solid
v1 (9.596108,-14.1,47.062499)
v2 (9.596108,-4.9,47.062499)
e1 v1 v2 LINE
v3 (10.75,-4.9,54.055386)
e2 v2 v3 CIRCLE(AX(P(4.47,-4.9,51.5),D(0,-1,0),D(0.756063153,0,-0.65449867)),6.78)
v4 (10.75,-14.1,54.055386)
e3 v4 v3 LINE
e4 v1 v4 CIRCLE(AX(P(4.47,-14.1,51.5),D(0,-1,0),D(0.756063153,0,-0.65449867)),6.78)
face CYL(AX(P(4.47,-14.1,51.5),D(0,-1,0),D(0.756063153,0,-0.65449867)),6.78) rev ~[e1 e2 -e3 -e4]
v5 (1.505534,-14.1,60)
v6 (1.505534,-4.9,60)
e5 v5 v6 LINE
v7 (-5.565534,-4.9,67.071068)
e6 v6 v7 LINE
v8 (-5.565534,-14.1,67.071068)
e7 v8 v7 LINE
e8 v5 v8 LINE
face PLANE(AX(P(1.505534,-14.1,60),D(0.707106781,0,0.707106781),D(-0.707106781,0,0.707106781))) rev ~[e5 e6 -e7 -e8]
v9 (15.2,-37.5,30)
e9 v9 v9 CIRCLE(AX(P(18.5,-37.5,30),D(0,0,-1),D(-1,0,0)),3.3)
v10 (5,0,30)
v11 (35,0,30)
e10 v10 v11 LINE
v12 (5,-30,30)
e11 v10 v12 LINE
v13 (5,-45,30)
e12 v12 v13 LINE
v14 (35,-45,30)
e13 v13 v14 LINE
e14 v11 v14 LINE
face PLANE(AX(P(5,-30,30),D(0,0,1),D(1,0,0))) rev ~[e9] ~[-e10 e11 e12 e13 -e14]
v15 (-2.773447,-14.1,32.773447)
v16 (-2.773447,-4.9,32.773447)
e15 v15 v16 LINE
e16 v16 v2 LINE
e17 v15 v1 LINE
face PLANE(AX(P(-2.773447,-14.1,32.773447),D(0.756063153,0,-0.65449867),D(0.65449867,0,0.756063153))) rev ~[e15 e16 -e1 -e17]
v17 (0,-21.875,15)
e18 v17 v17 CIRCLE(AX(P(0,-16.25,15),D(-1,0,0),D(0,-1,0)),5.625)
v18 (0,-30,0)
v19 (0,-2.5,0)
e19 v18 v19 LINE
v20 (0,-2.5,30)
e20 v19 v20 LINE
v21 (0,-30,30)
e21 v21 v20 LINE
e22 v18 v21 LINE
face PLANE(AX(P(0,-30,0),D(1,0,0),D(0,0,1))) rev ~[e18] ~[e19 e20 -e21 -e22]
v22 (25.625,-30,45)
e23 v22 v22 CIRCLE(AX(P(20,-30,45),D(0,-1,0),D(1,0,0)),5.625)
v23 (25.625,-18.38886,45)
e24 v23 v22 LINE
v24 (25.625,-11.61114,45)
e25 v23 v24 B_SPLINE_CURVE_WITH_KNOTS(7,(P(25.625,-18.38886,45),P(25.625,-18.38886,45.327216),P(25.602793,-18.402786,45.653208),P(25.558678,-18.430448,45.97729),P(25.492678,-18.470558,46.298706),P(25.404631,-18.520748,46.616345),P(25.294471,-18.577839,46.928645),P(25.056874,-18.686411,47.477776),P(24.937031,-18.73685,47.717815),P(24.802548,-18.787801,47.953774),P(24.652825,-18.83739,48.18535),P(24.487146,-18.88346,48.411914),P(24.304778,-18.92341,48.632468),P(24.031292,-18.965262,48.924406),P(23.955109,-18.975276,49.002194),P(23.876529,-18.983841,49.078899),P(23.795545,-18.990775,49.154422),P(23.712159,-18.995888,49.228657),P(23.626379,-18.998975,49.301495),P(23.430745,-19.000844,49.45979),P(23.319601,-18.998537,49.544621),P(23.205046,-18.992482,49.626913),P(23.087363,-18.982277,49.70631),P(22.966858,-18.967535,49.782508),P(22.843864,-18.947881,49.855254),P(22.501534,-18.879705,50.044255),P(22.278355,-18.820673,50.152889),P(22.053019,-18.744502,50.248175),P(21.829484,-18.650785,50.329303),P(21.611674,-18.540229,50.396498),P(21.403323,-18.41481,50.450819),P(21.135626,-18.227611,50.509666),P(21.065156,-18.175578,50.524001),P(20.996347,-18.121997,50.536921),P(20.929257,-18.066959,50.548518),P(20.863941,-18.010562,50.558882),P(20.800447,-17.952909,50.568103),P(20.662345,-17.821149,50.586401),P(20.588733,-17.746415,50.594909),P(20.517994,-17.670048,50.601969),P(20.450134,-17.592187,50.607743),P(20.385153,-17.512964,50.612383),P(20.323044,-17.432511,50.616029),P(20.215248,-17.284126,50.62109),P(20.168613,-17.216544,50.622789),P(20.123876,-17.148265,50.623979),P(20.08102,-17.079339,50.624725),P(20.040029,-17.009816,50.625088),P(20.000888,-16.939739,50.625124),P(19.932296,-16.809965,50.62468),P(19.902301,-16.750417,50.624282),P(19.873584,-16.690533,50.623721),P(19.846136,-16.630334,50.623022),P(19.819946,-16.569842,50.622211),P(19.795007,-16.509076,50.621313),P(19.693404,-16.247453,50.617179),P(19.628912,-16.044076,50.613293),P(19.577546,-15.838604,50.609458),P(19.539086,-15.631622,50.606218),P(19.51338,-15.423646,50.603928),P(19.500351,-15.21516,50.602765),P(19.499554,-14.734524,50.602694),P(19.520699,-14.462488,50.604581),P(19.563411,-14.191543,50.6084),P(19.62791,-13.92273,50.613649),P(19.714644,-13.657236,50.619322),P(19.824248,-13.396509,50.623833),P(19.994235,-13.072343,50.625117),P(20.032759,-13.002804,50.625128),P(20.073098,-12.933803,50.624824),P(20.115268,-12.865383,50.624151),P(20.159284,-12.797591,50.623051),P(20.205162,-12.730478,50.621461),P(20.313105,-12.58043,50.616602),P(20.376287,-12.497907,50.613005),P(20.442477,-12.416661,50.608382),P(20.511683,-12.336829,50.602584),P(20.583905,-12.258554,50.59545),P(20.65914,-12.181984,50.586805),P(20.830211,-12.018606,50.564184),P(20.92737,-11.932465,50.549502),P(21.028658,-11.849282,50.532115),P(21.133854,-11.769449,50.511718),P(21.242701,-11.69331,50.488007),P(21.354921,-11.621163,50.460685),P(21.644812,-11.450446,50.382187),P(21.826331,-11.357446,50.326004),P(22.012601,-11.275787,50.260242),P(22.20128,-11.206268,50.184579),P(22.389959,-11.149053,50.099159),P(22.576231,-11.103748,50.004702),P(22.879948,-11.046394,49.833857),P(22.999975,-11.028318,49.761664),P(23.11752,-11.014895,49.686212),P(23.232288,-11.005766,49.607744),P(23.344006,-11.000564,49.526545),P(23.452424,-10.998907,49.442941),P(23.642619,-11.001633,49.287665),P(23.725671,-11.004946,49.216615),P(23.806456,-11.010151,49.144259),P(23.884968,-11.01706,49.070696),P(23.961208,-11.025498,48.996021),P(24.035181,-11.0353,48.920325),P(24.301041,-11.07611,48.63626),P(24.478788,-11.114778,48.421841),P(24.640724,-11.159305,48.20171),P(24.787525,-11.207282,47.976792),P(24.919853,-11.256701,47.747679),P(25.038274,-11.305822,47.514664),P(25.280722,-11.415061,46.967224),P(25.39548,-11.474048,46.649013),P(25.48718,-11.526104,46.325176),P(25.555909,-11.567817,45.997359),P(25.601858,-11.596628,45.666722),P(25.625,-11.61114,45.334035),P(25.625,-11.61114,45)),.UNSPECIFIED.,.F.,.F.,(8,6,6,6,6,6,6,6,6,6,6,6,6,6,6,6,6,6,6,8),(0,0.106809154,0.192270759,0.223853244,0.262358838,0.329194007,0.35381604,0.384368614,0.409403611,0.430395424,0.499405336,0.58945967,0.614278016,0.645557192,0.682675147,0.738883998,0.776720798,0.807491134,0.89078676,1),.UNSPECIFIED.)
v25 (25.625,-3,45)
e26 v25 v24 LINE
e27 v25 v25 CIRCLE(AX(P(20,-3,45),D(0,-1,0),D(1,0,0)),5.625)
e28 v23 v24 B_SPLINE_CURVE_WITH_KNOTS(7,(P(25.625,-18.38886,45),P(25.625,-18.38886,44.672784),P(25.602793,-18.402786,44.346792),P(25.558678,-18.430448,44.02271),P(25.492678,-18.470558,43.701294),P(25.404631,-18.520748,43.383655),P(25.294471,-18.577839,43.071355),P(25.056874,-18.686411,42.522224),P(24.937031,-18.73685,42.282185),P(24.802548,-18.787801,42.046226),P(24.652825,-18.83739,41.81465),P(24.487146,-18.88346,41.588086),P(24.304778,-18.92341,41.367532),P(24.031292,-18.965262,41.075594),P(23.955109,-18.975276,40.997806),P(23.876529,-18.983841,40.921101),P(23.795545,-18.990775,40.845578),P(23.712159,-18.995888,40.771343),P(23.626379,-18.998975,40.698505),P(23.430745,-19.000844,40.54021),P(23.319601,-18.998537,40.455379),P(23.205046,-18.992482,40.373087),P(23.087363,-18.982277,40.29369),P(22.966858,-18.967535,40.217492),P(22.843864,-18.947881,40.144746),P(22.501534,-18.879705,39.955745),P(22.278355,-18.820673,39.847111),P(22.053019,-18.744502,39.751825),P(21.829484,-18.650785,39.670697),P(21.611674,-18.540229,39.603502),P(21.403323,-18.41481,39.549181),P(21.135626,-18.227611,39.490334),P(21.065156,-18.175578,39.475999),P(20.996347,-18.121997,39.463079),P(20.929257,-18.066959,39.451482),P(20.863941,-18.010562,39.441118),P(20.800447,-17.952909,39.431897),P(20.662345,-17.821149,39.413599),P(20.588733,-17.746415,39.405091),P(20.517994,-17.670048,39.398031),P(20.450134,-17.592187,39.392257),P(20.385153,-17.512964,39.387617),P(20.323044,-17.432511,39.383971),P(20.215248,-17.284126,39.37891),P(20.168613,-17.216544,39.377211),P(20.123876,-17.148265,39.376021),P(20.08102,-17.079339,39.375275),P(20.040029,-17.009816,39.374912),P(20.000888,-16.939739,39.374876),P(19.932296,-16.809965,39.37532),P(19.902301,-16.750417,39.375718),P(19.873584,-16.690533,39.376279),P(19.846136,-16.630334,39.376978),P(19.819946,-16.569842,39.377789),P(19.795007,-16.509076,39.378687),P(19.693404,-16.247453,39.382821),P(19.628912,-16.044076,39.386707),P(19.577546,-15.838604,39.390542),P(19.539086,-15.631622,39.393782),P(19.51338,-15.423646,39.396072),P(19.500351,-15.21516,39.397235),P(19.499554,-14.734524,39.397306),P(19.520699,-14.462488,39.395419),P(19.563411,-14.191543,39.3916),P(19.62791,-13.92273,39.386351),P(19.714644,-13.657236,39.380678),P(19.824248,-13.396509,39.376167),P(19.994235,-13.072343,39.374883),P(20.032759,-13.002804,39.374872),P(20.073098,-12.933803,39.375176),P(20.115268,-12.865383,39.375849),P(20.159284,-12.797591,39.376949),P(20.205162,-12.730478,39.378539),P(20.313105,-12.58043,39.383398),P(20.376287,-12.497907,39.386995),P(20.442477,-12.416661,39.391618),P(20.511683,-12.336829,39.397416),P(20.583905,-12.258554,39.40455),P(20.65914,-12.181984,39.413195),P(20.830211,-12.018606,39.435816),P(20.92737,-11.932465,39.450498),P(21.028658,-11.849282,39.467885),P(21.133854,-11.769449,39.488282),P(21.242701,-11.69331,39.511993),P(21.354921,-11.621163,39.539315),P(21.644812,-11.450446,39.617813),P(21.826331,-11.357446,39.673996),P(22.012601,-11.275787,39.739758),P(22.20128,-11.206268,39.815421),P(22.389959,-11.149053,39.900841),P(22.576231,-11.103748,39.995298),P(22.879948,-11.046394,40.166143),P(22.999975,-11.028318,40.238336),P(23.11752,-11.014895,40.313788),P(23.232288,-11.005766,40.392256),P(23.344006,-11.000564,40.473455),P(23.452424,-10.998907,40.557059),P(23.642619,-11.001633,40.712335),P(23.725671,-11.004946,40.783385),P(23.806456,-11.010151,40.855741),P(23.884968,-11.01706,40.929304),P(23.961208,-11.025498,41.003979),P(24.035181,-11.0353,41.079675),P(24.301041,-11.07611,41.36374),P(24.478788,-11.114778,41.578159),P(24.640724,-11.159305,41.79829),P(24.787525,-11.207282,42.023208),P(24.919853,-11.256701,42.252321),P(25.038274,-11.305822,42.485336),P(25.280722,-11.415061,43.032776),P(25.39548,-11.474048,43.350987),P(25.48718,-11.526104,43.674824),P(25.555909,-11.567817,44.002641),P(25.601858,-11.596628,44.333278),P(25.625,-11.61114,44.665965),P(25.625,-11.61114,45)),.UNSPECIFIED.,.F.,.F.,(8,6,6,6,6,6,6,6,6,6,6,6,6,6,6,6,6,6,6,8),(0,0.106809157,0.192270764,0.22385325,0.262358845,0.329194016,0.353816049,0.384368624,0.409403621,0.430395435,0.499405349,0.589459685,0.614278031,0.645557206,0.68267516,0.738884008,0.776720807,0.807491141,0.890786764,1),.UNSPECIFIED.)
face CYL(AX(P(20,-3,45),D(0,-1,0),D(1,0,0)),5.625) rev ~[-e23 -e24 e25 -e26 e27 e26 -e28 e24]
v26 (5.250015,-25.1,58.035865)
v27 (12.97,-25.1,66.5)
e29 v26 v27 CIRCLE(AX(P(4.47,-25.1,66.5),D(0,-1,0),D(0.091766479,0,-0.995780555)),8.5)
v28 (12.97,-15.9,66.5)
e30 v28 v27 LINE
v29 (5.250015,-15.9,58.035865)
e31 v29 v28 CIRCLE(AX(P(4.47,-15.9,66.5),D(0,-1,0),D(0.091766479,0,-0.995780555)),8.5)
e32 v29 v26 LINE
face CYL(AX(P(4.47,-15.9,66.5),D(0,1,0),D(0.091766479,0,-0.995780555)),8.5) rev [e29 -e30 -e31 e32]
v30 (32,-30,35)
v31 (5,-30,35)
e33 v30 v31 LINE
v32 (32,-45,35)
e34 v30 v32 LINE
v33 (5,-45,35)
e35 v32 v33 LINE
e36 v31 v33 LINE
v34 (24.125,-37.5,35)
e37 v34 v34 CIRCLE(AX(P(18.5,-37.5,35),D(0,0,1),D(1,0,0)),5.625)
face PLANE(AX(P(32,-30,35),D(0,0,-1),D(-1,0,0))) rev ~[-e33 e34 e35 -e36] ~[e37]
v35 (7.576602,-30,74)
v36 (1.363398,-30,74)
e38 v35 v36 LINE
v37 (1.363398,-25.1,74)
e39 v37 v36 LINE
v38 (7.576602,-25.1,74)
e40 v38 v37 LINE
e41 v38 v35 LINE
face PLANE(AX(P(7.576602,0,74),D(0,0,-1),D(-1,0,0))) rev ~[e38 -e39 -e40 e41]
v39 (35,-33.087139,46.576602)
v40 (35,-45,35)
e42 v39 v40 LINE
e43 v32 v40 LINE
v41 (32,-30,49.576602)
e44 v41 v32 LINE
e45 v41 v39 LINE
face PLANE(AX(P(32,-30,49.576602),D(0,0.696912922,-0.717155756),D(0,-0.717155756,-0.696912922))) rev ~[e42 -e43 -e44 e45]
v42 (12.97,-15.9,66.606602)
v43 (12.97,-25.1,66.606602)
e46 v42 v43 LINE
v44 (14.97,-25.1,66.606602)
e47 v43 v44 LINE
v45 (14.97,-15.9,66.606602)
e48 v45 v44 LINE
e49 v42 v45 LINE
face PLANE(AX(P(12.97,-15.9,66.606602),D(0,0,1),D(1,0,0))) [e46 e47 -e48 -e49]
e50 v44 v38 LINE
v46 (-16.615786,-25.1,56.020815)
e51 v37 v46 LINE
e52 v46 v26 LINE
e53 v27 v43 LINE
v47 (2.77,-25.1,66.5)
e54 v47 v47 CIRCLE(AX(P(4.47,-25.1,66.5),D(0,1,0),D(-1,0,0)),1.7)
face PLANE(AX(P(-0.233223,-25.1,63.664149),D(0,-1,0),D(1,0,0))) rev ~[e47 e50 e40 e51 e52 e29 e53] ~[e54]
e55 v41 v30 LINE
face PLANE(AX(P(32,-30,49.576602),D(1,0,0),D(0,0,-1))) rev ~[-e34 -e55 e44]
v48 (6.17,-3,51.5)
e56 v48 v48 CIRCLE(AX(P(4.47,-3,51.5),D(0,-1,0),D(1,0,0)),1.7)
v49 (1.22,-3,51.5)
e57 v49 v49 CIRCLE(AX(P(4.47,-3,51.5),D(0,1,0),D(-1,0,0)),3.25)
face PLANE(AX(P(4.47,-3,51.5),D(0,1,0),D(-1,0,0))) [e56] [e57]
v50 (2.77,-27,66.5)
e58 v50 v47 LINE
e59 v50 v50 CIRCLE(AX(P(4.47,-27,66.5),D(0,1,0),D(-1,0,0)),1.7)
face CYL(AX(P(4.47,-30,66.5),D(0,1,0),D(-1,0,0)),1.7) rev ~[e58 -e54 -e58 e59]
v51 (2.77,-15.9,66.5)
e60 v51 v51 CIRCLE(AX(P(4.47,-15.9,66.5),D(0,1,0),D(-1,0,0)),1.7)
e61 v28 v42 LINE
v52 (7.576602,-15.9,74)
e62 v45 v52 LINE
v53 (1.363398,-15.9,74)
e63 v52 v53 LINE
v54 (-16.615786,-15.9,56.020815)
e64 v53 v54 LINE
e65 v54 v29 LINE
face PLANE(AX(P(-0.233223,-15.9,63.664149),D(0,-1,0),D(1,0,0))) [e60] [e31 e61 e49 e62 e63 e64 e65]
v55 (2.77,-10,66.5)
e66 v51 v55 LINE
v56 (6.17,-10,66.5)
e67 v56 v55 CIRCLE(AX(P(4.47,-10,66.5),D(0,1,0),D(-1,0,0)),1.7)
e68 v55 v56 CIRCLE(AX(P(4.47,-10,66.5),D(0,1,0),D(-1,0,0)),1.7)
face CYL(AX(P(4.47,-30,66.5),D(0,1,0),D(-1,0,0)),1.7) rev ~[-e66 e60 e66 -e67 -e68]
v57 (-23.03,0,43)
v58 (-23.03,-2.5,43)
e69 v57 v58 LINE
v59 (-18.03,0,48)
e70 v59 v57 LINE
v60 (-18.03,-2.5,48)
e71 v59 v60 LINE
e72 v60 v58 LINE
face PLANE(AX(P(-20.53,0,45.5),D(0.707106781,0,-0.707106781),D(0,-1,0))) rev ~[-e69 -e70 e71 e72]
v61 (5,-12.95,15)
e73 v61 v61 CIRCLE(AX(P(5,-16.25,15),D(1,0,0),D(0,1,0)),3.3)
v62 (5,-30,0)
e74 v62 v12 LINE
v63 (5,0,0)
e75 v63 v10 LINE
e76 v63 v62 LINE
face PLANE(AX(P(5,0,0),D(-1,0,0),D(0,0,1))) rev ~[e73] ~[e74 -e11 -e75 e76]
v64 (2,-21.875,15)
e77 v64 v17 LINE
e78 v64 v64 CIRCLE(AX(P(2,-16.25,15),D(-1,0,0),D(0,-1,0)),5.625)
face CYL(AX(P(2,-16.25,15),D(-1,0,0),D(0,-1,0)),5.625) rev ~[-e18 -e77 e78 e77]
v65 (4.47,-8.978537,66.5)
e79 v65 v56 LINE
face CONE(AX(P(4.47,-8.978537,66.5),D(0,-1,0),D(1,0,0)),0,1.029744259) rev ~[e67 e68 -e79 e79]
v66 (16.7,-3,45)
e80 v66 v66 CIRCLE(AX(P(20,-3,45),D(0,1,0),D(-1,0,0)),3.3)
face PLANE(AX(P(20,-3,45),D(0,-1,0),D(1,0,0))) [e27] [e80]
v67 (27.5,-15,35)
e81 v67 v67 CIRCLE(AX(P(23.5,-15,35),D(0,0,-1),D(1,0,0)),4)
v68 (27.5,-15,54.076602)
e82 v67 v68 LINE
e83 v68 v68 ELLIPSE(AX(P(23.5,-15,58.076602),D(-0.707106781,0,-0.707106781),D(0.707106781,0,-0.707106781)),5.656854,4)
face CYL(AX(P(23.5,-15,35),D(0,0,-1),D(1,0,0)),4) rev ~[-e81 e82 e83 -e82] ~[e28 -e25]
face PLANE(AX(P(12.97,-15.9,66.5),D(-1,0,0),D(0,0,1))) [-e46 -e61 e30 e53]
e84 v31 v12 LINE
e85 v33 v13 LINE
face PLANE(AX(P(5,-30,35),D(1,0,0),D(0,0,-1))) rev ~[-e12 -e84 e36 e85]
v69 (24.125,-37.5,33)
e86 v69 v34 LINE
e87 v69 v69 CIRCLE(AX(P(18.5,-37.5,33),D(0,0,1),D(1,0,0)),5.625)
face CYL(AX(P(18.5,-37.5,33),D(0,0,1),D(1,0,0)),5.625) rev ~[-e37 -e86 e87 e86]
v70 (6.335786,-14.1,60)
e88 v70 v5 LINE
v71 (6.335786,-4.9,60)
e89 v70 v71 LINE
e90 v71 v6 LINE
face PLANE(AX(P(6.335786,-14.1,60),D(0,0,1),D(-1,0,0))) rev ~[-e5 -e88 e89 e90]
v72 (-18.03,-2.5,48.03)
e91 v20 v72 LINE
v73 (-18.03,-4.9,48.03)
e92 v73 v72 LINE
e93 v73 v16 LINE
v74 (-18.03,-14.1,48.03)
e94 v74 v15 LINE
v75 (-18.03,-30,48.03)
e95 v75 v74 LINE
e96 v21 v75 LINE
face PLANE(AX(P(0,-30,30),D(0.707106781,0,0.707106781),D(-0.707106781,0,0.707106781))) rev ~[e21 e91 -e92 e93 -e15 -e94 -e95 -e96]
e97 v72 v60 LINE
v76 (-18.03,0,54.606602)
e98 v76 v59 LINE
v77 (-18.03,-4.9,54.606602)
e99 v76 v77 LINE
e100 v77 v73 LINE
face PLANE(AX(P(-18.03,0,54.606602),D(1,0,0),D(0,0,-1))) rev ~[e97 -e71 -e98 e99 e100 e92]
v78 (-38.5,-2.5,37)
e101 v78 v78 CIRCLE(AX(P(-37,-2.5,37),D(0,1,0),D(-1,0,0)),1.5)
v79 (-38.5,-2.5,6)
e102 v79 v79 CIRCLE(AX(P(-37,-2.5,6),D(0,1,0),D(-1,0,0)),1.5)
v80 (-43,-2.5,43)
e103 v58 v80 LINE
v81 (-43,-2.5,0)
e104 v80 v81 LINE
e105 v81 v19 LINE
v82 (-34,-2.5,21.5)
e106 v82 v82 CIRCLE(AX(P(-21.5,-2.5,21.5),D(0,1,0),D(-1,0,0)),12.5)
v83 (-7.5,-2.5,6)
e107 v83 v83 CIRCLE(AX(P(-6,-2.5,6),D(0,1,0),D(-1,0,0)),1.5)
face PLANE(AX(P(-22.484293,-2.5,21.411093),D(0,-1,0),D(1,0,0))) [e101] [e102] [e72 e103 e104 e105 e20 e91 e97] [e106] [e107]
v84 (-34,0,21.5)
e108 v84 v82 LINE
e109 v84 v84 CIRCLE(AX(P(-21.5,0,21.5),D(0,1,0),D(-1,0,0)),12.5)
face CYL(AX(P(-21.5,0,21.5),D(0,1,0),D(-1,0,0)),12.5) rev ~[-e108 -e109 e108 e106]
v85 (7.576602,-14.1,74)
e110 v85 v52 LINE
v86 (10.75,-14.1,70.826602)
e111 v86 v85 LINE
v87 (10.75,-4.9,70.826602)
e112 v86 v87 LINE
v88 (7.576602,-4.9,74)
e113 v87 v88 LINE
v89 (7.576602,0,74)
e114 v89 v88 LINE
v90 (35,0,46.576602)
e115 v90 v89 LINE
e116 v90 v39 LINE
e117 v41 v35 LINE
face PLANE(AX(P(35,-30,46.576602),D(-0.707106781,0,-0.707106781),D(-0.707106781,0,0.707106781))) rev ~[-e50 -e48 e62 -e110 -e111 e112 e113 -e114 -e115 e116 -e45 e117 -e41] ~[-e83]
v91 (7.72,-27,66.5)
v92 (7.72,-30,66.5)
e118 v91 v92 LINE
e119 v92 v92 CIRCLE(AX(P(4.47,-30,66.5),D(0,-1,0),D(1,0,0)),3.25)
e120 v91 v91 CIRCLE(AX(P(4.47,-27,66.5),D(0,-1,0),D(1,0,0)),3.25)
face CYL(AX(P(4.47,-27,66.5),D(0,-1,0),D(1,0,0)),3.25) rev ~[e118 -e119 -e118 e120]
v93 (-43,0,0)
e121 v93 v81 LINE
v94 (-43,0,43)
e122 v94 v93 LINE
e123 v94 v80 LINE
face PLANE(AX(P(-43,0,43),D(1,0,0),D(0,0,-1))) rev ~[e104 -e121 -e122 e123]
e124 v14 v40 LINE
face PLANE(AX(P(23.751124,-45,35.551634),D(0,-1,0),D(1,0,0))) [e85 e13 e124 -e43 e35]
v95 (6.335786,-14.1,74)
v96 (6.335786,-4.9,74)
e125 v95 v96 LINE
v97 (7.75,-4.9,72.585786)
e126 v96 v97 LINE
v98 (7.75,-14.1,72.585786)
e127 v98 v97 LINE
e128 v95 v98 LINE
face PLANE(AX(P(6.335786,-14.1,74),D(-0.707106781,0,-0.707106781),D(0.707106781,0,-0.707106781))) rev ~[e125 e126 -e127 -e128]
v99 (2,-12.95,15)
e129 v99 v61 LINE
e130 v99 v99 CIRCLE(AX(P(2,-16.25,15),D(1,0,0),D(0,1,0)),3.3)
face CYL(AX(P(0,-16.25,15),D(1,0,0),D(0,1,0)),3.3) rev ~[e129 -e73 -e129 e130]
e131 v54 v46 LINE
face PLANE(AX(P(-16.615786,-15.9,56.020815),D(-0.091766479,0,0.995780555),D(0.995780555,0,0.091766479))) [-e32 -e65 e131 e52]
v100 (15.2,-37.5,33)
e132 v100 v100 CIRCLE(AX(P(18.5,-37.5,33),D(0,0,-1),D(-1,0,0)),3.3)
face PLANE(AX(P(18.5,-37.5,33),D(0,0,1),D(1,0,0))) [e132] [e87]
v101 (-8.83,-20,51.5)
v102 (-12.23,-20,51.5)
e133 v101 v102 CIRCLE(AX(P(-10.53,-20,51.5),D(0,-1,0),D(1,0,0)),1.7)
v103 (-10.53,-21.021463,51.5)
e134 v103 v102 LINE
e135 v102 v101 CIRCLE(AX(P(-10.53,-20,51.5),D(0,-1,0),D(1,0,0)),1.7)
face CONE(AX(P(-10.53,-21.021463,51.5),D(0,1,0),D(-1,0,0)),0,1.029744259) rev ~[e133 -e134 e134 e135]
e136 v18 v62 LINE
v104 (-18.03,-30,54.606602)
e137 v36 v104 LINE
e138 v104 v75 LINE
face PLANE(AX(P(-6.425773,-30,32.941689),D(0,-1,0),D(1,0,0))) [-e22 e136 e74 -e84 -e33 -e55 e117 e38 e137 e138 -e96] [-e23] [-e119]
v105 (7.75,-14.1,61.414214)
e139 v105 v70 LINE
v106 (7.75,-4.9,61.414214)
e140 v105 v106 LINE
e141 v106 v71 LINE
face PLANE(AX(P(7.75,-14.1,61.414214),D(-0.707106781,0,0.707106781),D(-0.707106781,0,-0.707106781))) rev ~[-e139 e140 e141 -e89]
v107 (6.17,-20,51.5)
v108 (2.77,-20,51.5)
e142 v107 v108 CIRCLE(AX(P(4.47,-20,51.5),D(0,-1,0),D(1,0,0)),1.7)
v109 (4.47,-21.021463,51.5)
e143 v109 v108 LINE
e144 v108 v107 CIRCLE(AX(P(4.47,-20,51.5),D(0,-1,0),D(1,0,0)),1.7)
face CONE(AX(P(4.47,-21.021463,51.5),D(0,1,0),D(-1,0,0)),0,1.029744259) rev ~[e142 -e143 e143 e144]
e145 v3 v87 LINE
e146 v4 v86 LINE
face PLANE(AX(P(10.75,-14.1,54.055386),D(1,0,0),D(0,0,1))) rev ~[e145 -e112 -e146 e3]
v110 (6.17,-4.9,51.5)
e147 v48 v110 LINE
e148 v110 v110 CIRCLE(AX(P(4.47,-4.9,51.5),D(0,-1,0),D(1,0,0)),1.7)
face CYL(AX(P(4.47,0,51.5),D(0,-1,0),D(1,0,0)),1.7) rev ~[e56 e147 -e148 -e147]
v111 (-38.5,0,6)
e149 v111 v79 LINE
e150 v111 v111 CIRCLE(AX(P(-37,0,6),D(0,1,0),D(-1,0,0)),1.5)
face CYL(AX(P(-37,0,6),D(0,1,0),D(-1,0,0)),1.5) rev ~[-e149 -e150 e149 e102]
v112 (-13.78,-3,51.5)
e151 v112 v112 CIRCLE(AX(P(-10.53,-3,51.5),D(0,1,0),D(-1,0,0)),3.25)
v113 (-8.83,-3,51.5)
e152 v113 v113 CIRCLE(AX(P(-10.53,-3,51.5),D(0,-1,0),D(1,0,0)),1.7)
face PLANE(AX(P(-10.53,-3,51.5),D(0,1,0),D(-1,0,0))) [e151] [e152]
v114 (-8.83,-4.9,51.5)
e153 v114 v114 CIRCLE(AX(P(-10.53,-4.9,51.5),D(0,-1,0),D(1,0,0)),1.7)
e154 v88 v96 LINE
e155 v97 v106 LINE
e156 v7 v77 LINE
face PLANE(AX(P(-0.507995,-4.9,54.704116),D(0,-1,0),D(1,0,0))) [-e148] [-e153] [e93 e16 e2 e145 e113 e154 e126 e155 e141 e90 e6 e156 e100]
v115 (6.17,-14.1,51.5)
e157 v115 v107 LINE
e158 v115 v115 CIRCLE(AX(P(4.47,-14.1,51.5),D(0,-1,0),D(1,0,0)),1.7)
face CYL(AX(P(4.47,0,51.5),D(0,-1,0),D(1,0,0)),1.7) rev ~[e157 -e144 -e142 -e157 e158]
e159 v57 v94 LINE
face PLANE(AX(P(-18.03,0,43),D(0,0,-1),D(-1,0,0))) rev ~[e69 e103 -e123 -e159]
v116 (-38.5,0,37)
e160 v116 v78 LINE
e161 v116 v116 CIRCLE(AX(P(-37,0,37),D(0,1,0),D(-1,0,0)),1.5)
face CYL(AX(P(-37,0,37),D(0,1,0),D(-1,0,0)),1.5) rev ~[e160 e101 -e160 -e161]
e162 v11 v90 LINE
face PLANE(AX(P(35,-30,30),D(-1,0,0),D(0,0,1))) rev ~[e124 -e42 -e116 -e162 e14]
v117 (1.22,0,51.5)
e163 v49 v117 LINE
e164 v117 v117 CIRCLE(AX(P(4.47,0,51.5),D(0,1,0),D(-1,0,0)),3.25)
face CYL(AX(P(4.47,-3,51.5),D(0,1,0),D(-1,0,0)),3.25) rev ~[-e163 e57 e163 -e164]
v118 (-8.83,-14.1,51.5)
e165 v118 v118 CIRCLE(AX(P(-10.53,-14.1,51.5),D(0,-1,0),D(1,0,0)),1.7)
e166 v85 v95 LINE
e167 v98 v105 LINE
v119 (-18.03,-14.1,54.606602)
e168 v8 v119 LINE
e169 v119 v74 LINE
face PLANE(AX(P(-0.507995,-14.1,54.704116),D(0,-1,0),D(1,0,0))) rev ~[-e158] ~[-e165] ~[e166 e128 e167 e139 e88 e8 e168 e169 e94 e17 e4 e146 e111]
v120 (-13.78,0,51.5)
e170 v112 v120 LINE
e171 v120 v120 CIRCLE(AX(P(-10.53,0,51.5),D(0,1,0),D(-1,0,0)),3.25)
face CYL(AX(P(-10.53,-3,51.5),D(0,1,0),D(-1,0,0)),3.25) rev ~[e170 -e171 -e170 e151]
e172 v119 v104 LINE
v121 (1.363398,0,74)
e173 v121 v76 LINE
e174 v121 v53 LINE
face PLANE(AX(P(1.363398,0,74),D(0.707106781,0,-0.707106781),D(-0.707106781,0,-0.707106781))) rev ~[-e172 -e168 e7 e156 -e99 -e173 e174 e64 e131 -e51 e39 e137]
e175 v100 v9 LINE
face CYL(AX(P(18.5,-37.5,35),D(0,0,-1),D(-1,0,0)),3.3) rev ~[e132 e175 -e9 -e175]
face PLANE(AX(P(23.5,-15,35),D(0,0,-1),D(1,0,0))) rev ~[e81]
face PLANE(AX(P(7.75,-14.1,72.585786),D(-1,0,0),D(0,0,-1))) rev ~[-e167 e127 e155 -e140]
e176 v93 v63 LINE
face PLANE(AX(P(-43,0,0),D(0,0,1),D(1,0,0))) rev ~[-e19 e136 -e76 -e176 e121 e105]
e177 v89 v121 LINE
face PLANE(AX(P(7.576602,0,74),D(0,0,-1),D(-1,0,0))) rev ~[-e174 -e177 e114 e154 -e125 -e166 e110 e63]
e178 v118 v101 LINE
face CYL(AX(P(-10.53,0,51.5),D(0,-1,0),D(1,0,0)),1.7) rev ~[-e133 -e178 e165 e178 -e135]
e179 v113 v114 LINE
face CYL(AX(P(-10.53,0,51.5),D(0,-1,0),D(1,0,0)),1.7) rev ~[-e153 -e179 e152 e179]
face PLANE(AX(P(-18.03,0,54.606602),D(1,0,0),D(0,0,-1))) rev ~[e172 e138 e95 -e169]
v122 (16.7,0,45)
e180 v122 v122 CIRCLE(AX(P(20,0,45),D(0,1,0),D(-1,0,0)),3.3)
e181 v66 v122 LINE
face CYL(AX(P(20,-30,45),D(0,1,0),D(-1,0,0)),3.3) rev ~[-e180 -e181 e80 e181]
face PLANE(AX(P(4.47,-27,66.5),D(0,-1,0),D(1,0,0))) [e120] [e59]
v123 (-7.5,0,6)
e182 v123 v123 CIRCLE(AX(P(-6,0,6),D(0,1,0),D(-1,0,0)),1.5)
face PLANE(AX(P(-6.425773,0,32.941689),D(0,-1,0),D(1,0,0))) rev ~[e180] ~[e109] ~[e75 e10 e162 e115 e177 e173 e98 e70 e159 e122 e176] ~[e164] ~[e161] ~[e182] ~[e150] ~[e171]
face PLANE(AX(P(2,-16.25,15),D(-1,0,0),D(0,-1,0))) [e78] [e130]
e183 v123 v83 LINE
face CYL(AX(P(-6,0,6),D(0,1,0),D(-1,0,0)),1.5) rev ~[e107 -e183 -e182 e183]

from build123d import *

# Parameters (mm, degrees)
F5_DEPTH        = 30
F7_DEPTH        = 27.5
F9_DEPTH        = 9.2
F11_DEPTH       = 9.2
F13_D           = 6.6
F13_CBORE_D     = 11.25
F13_CBORE_DEPTH = 27
F15_R           = 4
F16_DEPTH       = 39.001
F18_D           = 6.6
F18_CBORE_D     = 11.25
F18_CBORE_DEPTH = 2
F20_DEPTH       = 15
F22_D           = 6.6
F22_CBORE_D     = 11.25
F22_CBORE_DEPTH = 2
F24_DEPTH       = 3.001
F25_R           = 1.5
F25_R_2         = 12.5
F26_DEPTH       = 45.001
F28_D           = 3.4
F28_DEPTH       = 20
F28_CBORE_D     = 6.5
F28_CBORE_DEPTH = 3
F28_TIP         = 1.0214630523
F30_D           = 3.4
F30_DEPTH       = 20
F30_CBORE_D     = 6.5
F30_CBORE_DEPTH = 3
F30_TIP         = 1.0214630523
F31_SIZE        = 5


# Not quite as in the source:
# - a feature of the source that left no trace in its solid (it failed there, or was rolled back) is left out


with BuildPart() as f5:
    # F4 (on Front) → F5 (new body)
    with BuildSketch(Plane.XZ):
        Polygon((35, 46.5766017178), (7.5766017178, 74), (1.3633982822, 74), (-18.03, 54.6066017178), (-18.03, 43), (-43, 43), (-43, 0), (5, 0), (5, 30), (35, 30), align=None)
    extrude(amount=F5_DEPTH)

    # F6 (on face) → F7 (cut)
    with BuildSketch(Plane.XZ.offset(30)):
        Polygon((-43, 43), (-43, 0), (0, 0), (0, 30), (-18.03, 48.03), (-18.03, 43), align=None)
    extrude(amount=-F7_DEPTH, mode=Mode.SUBTRACT)

    # F8 (on offset) → F9 (cut)
    with BuildSketch(Plane.XZ.offset(14.1)):
        with BuildLine():
            Line((-18.03, 48.03), (-2.7734474577, 32.7734474577))
            Line((-2.7734474577, 32.7734474577), (9.5961081783, 47.0624990203))
            ThreePointArc((9.5961081783, 47.0624990203), (11.1595399436, 50.3961633531), (10.75, 54.0553864678))
            Line((10.75, 54.0553864678), (10.75, 70.8266017178))
            Line((10.75, 70.8266017178), (7.5766017178, 74))
            Line((7.5766017178, 74), (6.3357864376, 74))
            Line((6.3357864376, 74), (7.75, 72.5857864376))
            Line((7.75, 72.5857864376), (7.75, 61.4142135624))
            Line((7.75, 61.4142135624), (6.3357864376, 60))
            Line((6.3357864376, 60), (1.5055339059, 60))
            Line((1.5055339059, 60), (-5.5655339059, 67.0710678119))
            Line((-5.5655339059, 67.0710678119), (-18.03, 54.6066017178))
            Line((-18.03, 54.6066017178), (-18.03, 48.03))
        make_face()
    extrude(amount=-F9_DEPTH, mode=Mode.SUBTRACT)

    # F10 (on offset) → F11 (cut)
    with BuildSketch(Plane.XZ.offset(15.9)):
        with BuildLine():
            Line((1.3633982822, 74), (-16.6157864376, 56.0208152802))
            Line((-16.6157864376, 56.0208152802), (5.2500150699, 58.035865284))
            ThreePointArc((5.2500150699, 58.035865284), (10.7501324864, 60.7720041941), (12.97, 66.5))
            Line((12.97, 66.5), (12.97, 66.6066017178))
            Line((12.97, 66.6066017178), (14.97, 66.6066017178))
            Line((14.97, 66.6066017178), (7.5766017178, 74))
            Line((7.5766017178, 74), (1.3633982822, 74))
        make_face()
    extrude(amount=F11_DEPTH, mode=Mode.SUBTRACT)

    # F13 (through all)
    with Locations(Plane.XZ.offset(30)):
        with Locations((20, 45)):
            CounterBoreHole(F13_D / 2, F13_CBORE_D / 2, F13_CBORE_DEPTH)

    # F15 (on offset) → F16 (cut, through all)
    with BuildSketch(Plane(origin=(0, 0, 35), x_dir=(1, 0, 0), z_dir=(0, 0, -1))):
        with Locations((23.5, 15)):
            Circle(F15_R)
    extrude(amount=-F16_DEPTH, mode=Mode.SUBTRACT)

    # F18 (through all)
    with Locations(Plane(origin=(0, 0, 0), x_dir=(0, -1, 0), z_dir=(-1, 0, 0))):
        with Locations((16.25, 15)):
            CounterBoreHole(F18_D / 2, F18_CBORE_D / 2, F18_CBORE_DEPTH)

    # F19 (on face) → F20 (join)
    with BuildSketch(Plane.XZ.offset(30)):
        Polygon((5, 30), (35, 30), (35, 35), (35, 46.5766017178), (32, 49.5766017178), (32, 35), (5, 35), align=None)
    extrude(amount=F20_DEPTH)

    # F22 (through all)
    with Locations(Plane.XY.offset(35)):
        with Locations((18.5, -37.5)):
            CounterBoreHole(F22_D / 2, F22_CBORE_D / 2, F22_CBORE_DEPTH)

    # F23 (on face) → F24 (cut, through all)
    with BuildSketch(Plane(origin=(32, 0, 0), x_dir=(0, -1, 0), z_dir=(-1, 0, 0))):
        Polygon((45, 49.5766017178), (30, 49.5766017178), (45, 35), align=None)
    extrude(amount=-F24_DEPTH, mode=Mode.SUBTRACT)

    # F25 (on face) → F26 (cut, through all)
    with BuildSketch(Plane(origin=(0, 0, 0), x_dir=(-1, 0, 0), z_dir=(0, 1, 0))):
        with Locations((37, 37)):
            Circle(F25_R)
        with Locations((37, 6)):
            Circle(F25_R)
        with Locations((6, 6)):
            Circle(F25_R)
        with Locations((21.5, 21.5)):
            Circle(F25_R_2)
    extrude(amount=-F26_DEPTH, mode=Mode.SUBTRACT)

    # F28
    with Locations(Plane.XZ.offset(30)):
        with Locations((4.47, 66.5)):
            CounterBoreHole(F28_D / 2, F28_CBORE_D / 2, F28_CBORE_DEPTH, depth=F28_DEPTH)
            with Locations((0, 0, -(F28_DEPTH + F28_TIP / 2))):  # 118° drill point
                Cone(0, F28_D / 2, F28_TIP, mode=Mode.SUBTRACT)

    # F30
    with Locations(Plane(origin=(0, 0, 0), x_dir=(-1, 0, 0), z_dir=(0, 1, 0))):
        with Locations((-4.47, 51.5), (10.53, 51.5)):
            CounterBoreHole(F30_D / 2, F30_CBORE_D / 2, F30_CBORE_DEPTH, depth=F30_DEPTH)
            with Locations((0, 0, -(F30_DEPTH + F30_TIP / 2))):  # 118° drill point
                Cone(0, F30_D / 2, F30_TIP, mode=Mode.SUBTRACT)

    # F31
    f31_edges = [f5.edges().sort_by_distance(p)[0] for p in [
        (-18.03, -1.25, 43),
    ]]
    chamfer(f31_edges, length=F31_SIZE)


solid = f5.part
